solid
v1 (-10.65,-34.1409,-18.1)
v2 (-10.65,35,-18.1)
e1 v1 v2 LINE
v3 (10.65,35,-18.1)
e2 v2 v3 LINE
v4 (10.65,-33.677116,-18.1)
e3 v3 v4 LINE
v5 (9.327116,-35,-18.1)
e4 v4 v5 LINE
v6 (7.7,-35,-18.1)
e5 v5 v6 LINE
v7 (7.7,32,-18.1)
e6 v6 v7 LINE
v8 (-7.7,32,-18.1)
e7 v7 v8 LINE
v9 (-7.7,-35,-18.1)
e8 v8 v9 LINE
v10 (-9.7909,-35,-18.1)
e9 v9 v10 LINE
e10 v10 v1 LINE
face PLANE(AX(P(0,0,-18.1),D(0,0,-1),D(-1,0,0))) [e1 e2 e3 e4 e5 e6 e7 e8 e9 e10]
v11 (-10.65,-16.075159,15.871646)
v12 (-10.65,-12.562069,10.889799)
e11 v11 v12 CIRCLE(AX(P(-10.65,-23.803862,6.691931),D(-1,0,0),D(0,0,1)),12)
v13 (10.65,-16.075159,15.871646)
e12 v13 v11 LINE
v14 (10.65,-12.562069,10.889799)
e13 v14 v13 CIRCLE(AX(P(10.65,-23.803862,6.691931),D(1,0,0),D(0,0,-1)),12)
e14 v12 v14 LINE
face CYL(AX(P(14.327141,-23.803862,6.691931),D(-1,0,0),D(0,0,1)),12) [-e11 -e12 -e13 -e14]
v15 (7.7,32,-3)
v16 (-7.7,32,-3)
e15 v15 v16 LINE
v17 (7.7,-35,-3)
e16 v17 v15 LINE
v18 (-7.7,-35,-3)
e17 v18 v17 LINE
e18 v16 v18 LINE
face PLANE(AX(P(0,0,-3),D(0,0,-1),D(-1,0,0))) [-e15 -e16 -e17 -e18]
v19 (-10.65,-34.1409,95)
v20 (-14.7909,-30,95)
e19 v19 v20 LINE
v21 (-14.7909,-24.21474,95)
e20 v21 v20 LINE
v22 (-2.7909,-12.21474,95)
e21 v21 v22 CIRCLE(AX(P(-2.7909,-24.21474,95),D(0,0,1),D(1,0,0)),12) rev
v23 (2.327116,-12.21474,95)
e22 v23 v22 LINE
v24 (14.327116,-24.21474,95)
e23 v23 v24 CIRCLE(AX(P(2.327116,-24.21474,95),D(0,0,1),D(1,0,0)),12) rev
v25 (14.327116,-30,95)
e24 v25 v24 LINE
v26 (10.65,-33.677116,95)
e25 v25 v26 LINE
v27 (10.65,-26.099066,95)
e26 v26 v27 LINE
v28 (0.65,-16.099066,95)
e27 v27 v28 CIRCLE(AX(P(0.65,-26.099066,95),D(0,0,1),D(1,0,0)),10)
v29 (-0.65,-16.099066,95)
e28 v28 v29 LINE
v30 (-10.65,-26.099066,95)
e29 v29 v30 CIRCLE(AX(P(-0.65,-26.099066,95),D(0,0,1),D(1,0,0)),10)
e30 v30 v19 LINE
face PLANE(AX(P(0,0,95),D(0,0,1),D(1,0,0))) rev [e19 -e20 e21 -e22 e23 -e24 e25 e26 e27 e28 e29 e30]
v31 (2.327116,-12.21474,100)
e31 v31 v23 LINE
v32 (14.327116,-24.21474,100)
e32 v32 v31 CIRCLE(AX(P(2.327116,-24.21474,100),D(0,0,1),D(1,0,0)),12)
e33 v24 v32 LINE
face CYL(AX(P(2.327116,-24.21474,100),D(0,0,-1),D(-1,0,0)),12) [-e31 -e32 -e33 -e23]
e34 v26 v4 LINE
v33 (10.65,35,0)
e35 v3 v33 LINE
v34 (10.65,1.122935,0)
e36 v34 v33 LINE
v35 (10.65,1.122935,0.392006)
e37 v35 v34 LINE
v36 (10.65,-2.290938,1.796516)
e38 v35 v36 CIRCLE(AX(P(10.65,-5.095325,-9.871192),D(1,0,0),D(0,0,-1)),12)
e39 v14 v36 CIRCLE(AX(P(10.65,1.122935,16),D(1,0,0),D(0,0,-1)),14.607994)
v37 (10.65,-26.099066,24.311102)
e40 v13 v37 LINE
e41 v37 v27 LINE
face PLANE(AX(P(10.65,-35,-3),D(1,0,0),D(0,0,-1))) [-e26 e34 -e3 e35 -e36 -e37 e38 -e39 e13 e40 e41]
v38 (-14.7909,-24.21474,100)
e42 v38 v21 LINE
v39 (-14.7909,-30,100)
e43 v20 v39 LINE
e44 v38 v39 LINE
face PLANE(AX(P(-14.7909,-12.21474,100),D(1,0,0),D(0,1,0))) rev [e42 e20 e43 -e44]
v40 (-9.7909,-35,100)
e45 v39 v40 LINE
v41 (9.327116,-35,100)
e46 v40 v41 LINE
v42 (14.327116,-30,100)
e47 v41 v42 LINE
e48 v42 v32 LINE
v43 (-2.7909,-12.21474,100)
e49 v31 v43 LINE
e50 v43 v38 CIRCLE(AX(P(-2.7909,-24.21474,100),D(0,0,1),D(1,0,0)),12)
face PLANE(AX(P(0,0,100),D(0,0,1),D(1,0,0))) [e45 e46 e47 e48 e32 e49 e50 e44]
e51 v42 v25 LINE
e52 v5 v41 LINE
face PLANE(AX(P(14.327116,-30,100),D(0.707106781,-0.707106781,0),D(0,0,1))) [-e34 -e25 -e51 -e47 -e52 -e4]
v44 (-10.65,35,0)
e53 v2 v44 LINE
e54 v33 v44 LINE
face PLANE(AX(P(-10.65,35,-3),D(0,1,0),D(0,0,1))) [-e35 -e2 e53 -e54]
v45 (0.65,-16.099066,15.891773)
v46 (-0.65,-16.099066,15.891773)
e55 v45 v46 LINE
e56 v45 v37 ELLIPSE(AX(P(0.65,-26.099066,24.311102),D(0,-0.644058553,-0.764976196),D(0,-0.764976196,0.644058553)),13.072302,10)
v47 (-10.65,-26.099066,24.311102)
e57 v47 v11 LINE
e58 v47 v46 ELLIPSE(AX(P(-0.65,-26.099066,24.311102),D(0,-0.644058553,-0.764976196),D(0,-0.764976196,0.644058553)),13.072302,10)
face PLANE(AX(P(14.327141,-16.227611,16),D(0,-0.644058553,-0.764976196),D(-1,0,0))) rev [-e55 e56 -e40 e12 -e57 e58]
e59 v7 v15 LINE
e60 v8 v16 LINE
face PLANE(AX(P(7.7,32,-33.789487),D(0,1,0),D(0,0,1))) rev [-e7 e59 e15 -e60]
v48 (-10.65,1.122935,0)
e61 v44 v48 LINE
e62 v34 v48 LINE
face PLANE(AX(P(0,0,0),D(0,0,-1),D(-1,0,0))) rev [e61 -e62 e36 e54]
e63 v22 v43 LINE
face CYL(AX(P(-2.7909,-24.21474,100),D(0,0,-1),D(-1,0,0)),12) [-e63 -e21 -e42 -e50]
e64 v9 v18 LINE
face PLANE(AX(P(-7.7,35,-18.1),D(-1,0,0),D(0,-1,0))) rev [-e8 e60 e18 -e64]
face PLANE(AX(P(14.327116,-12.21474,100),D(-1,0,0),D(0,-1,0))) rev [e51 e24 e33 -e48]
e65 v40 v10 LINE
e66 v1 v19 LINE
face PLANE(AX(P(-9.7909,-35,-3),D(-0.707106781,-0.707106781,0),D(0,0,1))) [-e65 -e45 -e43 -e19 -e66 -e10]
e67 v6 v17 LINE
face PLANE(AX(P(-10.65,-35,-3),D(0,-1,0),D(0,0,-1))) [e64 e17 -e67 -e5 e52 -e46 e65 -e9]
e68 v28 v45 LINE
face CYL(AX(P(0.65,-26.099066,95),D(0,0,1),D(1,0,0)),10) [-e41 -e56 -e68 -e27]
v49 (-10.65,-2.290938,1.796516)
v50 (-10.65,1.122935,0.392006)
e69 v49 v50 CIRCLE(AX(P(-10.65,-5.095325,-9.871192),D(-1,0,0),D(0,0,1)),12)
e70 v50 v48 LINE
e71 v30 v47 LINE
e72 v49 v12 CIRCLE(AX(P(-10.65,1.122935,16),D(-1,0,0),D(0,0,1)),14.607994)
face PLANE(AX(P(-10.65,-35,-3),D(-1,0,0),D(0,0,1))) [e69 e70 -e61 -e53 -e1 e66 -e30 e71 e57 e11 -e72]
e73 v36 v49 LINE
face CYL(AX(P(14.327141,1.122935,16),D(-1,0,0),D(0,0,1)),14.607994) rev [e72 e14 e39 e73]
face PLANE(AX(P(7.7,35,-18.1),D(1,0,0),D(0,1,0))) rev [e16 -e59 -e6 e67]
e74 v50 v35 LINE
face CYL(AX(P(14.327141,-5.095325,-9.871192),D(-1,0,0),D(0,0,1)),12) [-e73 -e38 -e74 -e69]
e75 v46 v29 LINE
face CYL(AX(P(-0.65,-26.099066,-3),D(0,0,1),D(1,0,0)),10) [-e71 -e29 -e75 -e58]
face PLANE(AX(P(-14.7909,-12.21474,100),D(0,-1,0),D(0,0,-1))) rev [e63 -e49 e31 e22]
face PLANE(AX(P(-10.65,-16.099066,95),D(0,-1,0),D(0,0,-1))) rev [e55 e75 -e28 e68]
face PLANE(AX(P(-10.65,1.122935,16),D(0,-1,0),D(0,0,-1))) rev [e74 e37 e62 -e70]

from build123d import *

# Parameters (mm, degrees)
SKETCH1_W           = 21.3
SKETCH1_H           = 70
BOSS_EXTRUDE1_DEPTH = 3
BOSS_EXTRUDE2_DEPTH = 15.1
SKETCH3_W           = 15.400000000000002
SKETCH3_H           = 3
BOSS_EXTRUDE3_DEPTH = 15.1
BOSS_EXTRUDE4_DEPTH = 95
BOSS_EXTRUDE5_DEPTH = 5
SKETCH9_W           = 21.3
SKETCH9_H           = 17.22200087142766
BOSS_EXTRUDE6_DEPTH = 16.000000000000007
SKETCH12_R          = 14.60799399049553
CUT_EXTRUDE1_DEPTH  = 109.85245207766768
CHAMFER4_SIZE       = 1
CHAMFER5_SIZE       = 5
CHAMFER6_SIZE       = 5
FILLET4_R           = 12
FILLET5_R           = 12
FILLET6_R           = 12
FILLET7_R           = 10


with BuildPart() as part:
    # Sketch1 → Boss-Extrude1 (new body)
    with BuildSketch(Plane.XY):
        Rectangle(SKETCH1_W, SKETCH1_H)
    extrude(amount=-BOSS_EXTRUDE1_DEPTH)

    # Sketch2 → Boss-Extrude2 (add)
    with BuildSketch(Plane(origin=(0, 0, -3), x_dir=(-1, 0, 0), z_dir=(0, 0, -1))):
        Polygon((-10.649999999999999, 35), (-7.700000000000009, 35), (-7.700000000000002, -35), (-10.649999999999999, -35), align=None)
        Polygon((10.650000000000002, 35), (7.699999999999991, 35), (7.699999999999998, -35), (10.650000000000002, -35), align=None)
    extrude(amount=BOSS_EXTRUDE2_DEPTH)

    # Sketch3 → Boss-Extrude3 (add)
    with BuildSketch(Plane(origin=(0, 0, -3), x_dir=(-1, 0, 0), z_dir=(0, 0, -1))):
        with Locations((-9.33e-15, 33.5)):
            Rectangle(SKETCH3_W, SKETCH3_H)
    extrude(amount=BOSS_EXTRUDE3_DEPTH)

    # Sketch4 → Boss-Extrude4 (add)
    with BuildSketch(Plane.XY):
        Polygon((-10.650000000000002, -16.099065593181194), (10.649999999999999, -16.099065593181194), (10.650000000000007, -35), (-10.649999999999993, -35), align=None)
    extrude(amount=BOSS_EXTRUDE4_DEPTH)

    # Sketch6 → Boss-Extrude5 (add)
    with BuildSketch(Plane.XY.offset(95)):
        Polygon((-14.790899735714902, -12.21473987671473), (14.327115992863071, -12.21473987671473), (14.327115992863074, -35), (-14.790899735714893, -35), align=None)
    extrude(amount=BOSS_EXTRUDE5_DEPTH)

    # Sketch9 → Boss-Extrude6 (add)
    with BuildSketch(Plane.XY):
        with Locations((-1.78e-15, -7.488065157467364)):
            Rectangle(SKETCH9_W, SKETCH9_H)
    extrude(amount=BOSS_EXTRUDE6_DEPTH)

    # Sketch12 → Cut-Extrude1 (cut, through all)
    with BuildSketch(Plane.ZY.offset(10.650000000000002)):
        with Locations((16.000000000000007, 1.122935278246466)):
            Circle(SKETCH12_R)
    extrude(amount=-CUT_EXTRUDE1_DEPTH, mode=Mode.SUBTRACT)

    # Chamfer3
    # the kernel refuses this chamfer: 3 mm, written as the material it takes off along each edge
    with BuildSketch(Plane(origin=(17.73850714382705, -13.485058712249064, 16.000000000000007), x_dir=(0, 0.08550168468531993, -0.9963380259309449), z_dir=(-1, 0, 0))) as chamfer3_piece_1_section:
        with BuildLine():
            Line((2.582869005863168, -0.08485281374238583), (-0.31934564535848514, 2.817361837479259))
            Line((-0.31934564535848514, 2.817361837479259), (-0.37912592691434055, 2.81223173639814))
            ThreePointArc((-0.37912592691434055, 2.81223173639814), (-0.18095110257164257, 1.4068549031398474), (-0.05978028155585542, -0.00513010108111909))
            Line((-0.05978028155585542, -0.00513010108111909), (0.00513010108111924, -0.05978028155585719))
            ThreePointArc((0.00513010108111924, -0.05978028155585719), (1.2915393356537215, -0.00656807524010173), (2.5777389047820485, -0.1446330952982423))
            Line((2.5777389047820485, -0.1446330952982423), (2.582869005863168, -0.08485281374238583))
        make_face()
    chamfer3_piece_1 = extrude(amount=35.4770142876541, mode=Mode.PRIVATE)
    chamfer3_piece_1 = split(chamfer3_piece_1, bisect_by=Plane(origin=(17.73850714382705, -16.099065593181194, 16.000000000000007), z_dir=(0, 1, 0)), keep=Keep.TOP, mode=Mode.PRIVATE)
    add(chamfer3_piece_1, mode=Mode.SUBTRACT)

    # Chamfer4
    # the kernel refuses this chamfer: 1 mm, written as the material it takes off along each edge
    with BuildSketch(Plane(origin=(13.31779092299838, 1.122935278246466, 1.3920060095044775), x_dir=(0, -0.9993692754635791, 0.0355112835504551), z_dir=(-1, 0, 0))) as chamfer4_piece_1:
        with BuildLine():
            Line((1.0374972333996406, 1e-17), (-CHAMFER4_SIZE * 0.0355112835505, -CHAMFER4_SIZE * 0.999369275464))
            Line((-CHAMFER4_SIZE * 0.0355112835505, -CHAMFER4_SIZE * 0.999369275464), (0, 0))
            ThreePointArc((0, 0), (0.5334069539111667, -0.00920626580887721), (1.0374972333996406, 1e-17))
        make_face()
    extrude(amount=26.63558184599676, mode=Mode.SUBTRACT)

    # Chamfer5
    chamfer5_edges = [part.edges().sort_by_distance(p)[0] for p in [
        (-14.790899735714893, -35, 97.5),
    ]]
    chamfer(chamfer5_edges, length=CHAMFER5_SIZE)

    # Chamfer6
    chamfer6_edges = [part.edges().sort_by_distance(p)[0] for p in [
        (14.327115992863074, -35, 97.5),
    ]]
    chamfer(chamfer6_edges, length=CHAMFER6_SIZE)

    # Fillet4
    fillet4_edges = [part.edges().sort_by_distance(p)[0] for p in [
        (14.327115992863071, -12.21473987671473, 97.5),
        (-14.790899735714902, -12.21473987671473, 97.5),
    ]]
    fillet(fillet4_edges, radius=FILLET4_R)

    # Fillet5
    fillet5_edges = [part.edges().sort_by_distance(p)[0] for p in [
        (-1.78e-15, -13.271474119451348, 13.511131478397797),
    ]]
    fillet(fillet5_edges, radius=FILLET5_R)

    # Fillet6
    # the kernel refuses this fillet: 12 mm, written as the material it takes off along each edge
    with BuildSketch(Plane(origin=(16.66324146618684, 0.086092419807557, 1.428848867941594), x_dir=(0, -0.9882482751789802, 0.15285727527916634), z_dir=(-1, 0, 0))) as fillet6_piece_1:
        with BuildLine():
            CenterArc((3.393233706942116, -11.959263365525597), FILLET6_R, 94.7223972339899, 17.695866700852164)
            Line((-1.1831471407174274, -0.8661691922493711), (-1.274674757670618, -0.6443073087838466))
            ThreePointArc((-1.274674757670618, -0.6443073087838466), (-0.7333441241917547, -0.2394325626577685), (-0.1417705538330419, 0.19365203346691875))
            Line((-0.1417705538330419, 0.19365203346691875), (0.01975874240954748, 0.23918526731049536))
            ThreePointArc((0.01975874240954748, 0.23918526731049536), (1.2026482932374447, 0.19040995736707406), (2.38553784406539, 0.23918526731051196))
            Line((2.38553784406539, 0.23918526731051196), (2.405296586474737, 0))
        make_face()
    extrude(amount=33.32648293237368, mode=Mode.SUBTRACT)

    # Fillet7
    fillet7_edges = [part.edges().sort_by_distance(p)[0] for p in [
        (-10.650000000000002, -16.099065593181095, 55.44588674849325),
        (10.649999999999999, -16.099065593181095, 55.44588674849325),
    ]]
    fillet(fillet7_edges, radius=FILLET7_R)


solid = part.part
